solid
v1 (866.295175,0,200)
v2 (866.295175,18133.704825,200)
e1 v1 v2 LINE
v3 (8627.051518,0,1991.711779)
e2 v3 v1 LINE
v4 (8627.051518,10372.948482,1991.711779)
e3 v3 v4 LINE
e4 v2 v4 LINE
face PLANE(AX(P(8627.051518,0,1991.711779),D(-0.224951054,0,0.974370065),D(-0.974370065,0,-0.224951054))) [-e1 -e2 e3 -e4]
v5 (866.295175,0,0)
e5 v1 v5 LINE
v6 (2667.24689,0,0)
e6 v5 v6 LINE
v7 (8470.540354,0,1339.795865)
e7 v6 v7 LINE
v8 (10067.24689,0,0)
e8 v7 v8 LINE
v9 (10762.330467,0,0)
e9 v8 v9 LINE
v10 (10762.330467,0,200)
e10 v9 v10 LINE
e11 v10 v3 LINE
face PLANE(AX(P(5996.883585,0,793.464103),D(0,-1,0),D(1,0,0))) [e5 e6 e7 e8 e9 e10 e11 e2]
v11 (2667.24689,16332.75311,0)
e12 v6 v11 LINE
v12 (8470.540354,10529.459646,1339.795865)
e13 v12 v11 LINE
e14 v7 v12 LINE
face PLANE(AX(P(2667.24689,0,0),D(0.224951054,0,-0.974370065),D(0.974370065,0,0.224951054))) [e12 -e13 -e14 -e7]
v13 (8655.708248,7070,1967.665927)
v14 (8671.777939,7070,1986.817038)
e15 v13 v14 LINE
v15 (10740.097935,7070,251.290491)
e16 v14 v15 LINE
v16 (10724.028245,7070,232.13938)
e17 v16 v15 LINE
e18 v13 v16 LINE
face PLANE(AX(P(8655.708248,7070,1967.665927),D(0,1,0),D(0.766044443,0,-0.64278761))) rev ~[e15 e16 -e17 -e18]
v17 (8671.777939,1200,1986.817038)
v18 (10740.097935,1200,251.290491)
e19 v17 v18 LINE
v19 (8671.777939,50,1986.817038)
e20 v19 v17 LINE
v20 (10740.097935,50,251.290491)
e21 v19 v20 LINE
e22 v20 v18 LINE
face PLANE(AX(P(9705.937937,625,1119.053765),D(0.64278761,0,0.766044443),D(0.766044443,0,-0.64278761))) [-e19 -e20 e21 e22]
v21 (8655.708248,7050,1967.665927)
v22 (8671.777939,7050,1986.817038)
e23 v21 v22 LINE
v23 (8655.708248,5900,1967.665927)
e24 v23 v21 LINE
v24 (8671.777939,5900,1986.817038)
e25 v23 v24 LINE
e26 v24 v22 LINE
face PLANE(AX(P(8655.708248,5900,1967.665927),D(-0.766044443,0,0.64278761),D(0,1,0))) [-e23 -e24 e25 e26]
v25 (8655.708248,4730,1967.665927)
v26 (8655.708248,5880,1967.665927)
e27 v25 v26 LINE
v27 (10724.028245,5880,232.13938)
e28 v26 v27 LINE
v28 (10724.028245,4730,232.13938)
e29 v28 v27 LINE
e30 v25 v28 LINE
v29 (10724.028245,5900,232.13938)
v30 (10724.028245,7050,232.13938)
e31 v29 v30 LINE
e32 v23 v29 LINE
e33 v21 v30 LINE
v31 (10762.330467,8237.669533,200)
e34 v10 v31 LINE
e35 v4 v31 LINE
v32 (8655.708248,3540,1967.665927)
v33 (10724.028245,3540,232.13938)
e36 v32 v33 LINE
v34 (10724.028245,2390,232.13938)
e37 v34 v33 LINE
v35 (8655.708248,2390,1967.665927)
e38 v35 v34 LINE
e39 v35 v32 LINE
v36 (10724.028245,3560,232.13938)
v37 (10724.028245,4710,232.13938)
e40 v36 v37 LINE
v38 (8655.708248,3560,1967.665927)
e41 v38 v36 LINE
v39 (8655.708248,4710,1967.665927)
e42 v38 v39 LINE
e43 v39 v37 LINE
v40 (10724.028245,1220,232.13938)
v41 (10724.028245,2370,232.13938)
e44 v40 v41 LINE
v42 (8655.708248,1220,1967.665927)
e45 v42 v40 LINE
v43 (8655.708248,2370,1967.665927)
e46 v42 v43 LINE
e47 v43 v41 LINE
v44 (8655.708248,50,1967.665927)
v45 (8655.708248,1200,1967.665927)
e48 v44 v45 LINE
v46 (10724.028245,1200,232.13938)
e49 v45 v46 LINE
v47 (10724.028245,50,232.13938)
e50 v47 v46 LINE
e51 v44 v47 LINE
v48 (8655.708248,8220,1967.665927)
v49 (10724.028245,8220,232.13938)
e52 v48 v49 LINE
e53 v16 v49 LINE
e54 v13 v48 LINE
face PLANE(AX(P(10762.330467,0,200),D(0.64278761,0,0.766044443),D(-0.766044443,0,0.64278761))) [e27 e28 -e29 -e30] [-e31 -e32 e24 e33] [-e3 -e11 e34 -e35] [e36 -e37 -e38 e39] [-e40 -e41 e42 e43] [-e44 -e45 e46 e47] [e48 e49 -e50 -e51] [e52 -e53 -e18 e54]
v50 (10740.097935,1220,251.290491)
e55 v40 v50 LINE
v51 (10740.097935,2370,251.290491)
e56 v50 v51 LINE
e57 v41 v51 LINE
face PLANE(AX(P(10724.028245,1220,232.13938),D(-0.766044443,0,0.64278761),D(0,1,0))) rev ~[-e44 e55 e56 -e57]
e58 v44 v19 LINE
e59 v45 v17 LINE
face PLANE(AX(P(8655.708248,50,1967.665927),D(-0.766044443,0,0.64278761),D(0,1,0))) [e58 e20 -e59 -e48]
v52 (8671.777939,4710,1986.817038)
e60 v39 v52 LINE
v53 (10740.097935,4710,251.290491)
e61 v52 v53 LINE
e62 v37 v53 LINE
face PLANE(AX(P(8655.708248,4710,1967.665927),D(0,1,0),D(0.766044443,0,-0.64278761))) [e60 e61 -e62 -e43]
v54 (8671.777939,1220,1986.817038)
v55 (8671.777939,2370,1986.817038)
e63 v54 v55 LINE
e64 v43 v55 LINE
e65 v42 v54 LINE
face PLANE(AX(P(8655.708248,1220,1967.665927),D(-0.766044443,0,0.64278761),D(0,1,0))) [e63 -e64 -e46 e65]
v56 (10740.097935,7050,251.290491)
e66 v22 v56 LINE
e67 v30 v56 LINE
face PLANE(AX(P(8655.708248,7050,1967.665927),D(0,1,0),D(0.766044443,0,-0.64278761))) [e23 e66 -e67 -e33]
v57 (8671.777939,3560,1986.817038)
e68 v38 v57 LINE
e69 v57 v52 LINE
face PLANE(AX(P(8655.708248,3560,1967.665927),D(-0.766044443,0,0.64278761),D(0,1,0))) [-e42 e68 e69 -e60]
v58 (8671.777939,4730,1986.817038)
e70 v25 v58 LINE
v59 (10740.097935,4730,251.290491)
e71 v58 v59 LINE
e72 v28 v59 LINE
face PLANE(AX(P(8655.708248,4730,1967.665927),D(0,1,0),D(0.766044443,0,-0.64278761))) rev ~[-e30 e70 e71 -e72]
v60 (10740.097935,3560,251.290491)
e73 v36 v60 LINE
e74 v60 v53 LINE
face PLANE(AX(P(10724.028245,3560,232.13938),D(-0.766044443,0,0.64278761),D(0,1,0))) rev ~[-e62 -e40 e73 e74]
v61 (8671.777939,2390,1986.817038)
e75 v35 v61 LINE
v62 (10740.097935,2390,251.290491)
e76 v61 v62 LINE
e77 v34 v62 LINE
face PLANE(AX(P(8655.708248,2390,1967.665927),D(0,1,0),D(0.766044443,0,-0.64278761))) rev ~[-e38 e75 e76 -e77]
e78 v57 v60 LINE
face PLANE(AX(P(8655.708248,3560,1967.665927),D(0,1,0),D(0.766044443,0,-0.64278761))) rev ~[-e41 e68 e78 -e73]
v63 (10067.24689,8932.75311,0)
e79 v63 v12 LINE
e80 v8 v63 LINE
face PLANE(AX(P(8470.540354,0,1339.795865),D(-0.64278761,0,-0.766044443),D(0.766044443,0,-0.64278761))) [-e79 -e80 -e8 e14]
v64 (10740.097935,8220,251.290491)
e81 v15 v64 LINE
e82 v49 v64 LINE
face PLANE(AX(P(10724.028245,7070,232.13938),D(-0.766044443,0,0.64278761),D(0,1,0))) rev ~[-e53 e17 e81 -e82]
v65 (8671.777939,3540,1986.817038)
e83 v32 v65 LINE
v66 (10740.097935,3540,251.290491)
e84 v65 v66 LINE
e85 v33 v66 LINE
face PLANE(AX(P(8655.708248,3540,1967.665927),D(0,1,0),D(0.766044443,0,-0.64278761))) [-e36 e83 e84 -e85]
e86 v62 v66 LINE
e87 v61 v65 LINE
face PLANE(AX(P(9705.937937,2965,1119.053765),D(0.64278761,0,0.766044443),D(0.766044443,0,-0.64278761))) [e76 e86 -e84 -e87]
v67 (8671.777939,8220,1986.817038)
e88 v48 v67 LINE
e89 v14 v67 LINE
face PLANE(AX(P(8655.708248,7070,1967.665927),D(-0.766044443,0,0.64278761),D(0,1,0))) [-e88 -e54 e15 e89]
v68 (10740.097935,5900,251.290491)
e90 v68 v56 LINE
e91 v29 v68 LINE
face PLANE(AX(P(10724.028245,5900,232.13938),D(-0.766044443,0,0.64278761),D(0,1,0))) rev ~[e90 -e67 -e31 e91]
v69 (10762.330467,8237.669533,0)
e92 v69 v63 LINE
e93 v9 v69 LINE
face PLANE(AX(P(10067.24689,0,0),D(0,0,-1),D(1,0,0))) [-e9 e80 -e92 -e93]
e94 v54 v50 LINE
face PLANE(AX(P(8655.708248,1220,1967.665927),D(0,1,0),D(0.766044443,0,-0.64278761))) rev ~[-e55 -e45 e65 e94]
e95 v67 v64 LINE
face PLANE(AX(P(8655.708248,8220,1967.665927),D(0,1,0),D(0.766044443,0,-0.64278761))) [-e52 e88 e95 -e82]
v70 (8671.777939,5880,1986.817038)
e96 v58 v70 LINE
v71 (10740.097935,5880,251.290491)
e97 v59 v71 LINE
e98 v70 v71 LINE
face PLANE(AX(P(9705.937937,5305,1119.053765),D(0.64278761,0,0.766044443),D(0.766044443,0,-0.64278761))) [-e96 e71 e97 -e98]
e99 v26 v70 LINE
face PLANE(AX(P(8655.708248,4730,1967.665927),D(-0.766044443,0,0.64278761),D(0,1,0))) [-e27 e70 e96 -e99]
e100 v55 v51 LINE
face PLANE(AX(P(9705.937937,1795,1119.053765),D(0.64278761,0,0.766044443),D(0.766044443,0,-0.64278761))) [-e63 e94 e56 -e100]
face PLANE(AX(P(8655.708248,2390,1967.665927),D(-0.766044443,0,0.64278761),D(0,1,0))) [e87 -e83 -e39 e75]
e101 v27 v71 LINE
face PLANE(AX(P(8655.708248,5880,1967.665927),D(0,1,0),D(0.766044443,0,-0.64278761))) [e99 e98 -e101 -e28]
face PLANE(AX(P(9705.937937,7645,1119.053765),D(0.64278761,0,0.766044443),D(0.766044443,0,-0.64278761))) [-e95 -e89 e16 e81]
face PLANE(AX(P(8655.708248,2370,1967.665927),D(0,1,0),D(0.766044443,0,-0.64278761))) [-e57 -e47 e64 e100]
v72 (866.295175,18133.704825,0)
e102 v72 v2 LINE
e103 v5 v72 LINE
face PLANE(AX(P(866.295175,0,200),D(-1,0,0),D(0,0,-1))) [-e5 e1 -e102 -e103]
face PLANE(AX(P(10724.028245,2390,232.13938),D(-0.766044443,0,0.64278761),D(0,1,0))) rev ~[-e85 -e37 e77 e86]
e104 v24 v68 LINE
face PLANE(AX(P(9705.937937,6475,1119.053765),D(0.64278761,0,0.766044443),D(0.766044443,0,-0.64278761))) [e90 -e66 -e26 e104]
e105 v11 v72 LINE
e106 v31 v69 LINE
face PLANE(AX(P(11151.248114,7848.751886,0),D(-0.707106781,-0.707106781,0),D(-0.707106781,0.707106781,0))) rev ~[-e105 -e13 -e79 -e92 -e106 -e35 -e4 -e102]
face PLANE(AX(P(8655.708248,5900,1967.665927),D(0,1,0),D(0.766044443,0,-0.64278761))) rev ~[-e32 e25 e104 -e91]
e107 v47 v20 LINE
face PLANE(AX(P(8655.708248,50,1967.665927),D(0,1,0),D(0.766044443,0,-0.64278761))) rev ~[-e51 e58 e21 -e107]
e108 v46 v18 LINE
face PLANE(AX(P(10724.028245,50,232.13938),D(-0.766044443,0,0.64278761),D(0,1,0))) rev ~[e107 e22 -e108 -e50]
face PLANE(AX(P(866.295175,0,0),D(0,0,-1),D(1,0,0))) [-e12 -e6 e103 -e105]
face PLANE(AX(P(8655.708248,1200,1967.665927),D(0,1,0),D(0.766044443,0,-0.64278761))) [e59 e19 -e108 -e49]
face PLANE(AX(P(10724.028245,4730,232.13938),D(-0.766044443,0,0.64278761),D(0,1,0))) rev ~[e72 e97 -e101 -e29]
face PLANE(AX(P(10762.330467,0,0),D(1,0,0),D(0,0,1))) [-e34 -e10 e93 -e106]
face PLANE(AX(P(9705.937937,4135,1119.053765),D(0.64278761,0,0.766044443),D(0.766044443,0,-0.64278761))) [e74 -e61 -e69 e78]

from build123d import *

# Parameters (mm, degrees)
F1_DEPTH = 19000
F3_DEPTH = 1991.7127787042
F4_W     = 2700
F4_H     = 1150
F5_DEPTH = 25


# Not quite as in the source:
# - a feature names something its author has since deleted; it is built from what else it names


with BuildPart() as f1:
    # F0 (on Front) → F1 (new body)
    with BuildSketch(Plane.XZ):
        Polygon((8627.0515179848, 1991.7117787042), (866.2951748568, 200), (866.2951748568, 0), (2667.2468895515, 0), (8470.5403543473, 1339.7958647882), (10067.2468895515, 0), (10762.3304671489, 0), (10762.3304671489, 200), align=None)
    extrude(amount=-F1_DEPTH)

    # F2 (on face) → F3 (cut, through all)
    with BuildSketch(Plane(origin=(0, 0, 0), x_dir=(1, 0, 0), z_dir=(0, 0, -1))):
        Polygon((2667.2468895515, -16332.7531104485), (2667.2468895515, -19000), (11151.2481142848, -19000), (11151.2481142848, -7848.7518857152), align=None)
        Polygon((866.2951748568, -18133.7048251432), (866.2951748568, -19000), (2667.2468895515, -19000), (2667.2468895515, -16332.7531104485), align=None)
    extrude(amount=-F3_DEPTH, mode=Mode.SUBTRACT)

    # F4 (on face) → F5 (join)
    with BuildSketch(Plane(origin=(4545.2164723408, 0, 5416.7780600306), x_dir=(0.7660444431, 0, -0.6427876097), z_dir=(0.6427876097, 0, 0.7660444431))):
        with Locations((6715.8659274322, 625)):
            Rectangle(F4_W, F4_H)
        with Locations((6715.8659274322, 1795)):
            Rectangle(F4_W, F4_H)
        with Locations((6715.8659274322, 2965)):
            Rectangle(F4_W, F4_H)
        with Locations((6715.8659274322, 4135)):
            Rectangle(F4_W, F4_H)
        with Locations((6715.8659274322, 5305)):
            Rectangle(F4_W, F4_H)
        with Locations((6715.8659274322, 6475)):
            Rectangle(F4_W, F4_H)
        with Locations((6715.8659274322, 7645)):
            Rectangle(F4_W, F4_H)
    extrude(amount=F5_DEPTH)


solid = f1.part
